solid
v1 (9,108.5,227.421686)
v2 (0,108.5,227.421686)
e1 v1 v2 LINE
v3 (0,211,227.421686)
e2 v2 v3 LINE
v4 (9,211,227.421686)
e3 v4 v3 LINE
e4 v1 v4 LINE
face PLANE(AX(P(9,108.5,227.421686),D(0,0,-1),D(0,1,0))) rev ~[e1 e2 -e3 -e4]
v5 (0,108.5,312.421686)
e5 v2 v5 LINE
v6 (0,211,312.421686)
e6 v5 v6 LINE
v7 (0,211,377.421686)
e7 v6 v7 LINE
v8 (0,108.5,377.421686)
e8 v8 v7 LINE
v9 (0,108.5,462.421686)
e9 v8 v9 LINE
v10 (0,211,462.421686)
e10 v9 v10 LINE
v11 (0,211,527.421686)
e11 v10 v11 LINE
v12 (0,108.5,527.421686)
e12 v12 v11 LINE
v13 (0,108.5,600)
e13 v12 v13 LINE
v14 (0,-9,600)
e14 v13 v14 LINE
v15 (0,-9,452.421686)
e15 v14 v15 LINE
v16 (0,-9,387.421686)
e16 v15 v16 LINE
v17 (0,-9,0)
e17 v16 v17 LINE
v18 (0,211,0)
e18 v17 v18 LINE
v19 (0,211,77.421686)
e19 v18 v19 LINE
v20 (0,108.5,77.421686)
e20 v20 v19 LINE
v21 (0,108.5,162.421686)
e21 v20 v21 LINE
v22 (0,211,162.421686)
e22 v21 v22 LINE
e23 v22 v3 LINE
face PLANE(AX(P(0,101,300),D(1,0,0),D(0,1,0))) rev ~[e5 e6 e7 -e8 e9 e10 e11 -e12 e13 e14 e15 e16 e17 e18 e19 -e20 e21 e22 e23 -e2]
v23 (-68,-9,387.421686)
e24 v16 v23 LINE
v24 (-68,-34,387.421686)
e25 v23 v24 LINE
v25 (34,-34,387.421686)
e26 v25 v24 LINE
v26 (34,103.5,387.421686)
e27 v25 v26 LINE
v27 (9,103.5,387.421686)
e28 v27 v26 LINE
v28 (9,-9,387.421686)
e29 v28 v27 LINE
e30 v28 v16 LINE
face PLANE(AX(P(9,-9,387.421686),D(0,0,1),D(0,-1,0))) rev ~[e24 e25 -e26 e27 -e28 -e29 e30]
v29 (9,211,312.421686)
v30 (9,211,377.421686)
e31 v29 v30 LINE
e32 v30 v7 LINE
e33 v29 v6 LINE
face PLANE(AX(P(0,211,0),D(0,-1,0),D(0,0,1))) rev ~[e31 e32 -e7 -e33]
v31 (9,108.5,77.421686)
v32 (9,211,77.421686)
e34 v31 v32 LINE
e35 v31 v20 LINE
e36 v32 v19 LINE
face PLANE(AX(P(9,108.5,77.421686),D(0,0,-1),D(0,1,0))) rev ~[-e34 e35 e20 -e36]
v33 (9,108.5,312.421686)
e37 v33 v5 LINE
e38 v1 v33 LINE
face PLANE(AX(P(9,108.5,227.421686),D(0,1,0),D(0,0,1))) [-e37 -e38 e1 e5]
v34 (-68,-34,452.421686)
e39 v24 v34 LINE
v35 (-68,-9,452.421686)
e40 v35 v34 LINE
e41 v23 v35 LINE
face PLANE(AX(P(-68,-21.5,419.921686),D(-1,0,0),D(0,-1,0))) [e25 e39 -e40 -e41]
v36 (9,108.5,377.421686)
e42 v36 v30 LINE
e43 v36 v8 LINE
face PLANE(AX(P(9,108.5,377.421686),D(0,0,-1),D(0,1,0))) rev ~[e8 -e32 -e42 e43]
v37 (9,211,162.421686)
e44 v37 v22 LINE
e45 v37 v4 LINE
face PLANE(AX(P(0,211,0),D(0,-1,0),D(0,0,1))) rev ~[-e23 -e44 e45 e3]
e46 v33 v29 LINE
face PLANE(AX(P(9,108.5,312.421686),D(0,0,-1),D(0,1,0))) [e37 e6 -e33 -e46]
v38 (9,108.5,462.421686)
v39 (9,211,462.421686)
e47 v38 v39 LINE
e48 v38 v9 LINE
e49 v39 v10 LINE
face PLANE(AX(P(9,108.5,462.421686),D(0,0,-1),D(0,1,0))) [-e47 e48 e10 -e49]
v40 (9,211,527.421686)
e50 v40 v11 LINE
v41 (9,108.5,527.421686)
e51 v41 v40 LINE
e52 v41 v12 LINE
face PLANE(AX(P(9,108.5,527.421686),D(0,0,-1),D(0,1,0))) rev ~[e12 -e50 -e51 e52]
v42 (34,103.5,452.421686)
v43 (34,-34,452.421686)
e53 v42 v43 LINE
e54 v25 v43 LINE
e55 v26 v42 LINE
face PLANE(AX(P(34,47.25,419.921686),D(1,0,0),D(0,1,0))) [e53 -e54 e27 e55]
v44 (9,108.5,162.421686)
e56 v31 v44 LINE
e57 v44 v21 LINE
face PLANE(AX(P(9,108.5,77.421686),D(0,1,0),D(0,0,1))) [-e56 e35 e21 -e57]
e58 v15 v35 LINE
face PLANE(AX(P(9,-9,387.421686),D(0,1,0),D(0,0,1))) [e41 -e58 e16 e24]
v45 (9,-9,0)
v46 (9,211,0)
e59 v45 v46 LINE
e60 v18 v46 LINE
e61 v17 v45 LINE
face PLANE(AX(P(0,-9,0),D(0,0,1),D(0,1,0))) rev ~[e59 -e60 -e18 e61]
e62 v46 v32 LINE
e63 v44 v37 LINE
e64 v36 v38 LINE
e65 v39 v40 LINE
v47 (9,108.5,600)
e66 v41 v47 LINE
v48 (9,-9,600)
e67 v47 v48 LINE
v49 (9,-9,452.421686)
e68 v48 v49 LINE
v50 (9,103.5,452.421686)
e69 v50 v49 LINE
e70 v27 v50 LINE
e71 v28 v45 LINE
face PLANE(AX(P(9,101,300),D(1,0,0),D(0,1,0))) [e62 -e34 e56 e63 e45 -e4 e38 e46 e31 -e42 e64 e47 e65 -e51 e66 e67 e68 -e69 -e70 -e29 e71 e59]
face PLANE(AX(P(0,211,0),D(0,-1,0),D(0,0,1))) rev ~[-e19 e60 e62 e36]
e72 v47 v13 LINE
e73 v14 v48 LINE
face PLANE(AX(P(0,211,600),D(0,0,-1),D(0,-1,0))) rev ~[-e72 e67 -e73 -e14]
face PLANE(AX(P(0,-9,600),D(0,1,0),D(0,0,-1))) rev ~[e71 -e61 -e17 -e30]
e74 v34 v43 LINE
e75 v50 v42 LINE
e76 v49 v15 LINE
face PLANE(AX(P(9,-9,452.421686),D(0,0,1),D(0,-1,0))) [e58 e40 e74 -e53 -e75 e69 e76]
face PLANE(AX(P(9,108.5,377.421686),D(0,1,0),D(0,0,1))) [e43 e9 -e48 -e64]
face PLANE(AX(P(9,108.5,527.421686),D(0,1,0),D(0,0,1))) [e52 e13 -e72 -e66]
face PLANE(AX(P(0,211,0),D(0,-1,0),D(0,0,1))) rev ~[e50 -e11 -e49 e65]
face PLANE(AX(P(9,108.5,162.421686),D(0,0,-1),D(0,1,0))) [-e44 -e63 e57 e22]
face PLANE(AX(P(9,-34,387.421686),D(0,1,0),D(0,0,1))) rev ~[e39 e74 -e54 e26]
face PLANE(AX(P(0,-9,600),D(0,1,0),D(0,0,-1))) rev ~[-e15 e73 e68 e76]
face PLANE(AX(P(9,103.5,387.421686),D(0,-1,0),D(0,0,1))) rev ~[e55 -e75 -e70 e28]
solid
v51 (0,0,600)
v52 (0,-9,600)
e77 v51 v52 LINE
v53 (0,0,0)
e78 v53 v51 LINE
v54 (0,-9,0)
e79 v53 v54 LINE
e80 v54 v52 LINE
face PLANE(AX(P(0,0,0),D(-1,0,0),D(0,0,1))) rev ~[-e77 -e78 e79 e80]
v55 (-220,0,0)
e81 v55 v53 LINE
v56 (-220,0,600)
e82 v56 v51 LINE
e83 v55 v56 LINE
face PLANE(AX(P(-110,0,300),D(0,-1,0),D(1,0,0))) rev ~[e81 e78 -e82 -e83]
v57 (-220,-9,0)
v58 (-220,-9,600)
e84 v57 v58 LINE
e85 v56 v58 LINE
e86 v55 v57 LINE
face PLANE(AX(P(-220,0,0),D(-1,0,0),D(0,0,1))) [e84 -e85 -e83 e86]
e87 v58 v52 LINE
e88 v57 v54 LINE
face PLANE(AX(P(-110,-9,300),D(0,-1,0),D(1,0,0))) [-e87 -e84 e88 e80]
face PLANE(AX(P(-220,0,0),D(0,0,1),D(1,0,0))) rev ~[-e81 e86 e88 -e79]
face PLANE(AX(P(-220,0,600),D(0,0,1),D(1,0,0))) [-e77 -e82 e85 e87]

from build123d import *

# Parameters (mm, degrees)
F0_W     = 220
F0_H     = 600
F1_DEPTH = 9
F3_DEPTH = 9
F4_W     = 102.5
F4_H     = 72.5783139467
F4_H_2   = 85
F5_DEPTH = 25
F6_W     = 112.5
F6_H     = 65
F6_W_2   = 25
F7_DEPTH = 25
F8_W     = 25
F8_H     = 65
F9_DEPTH = 77


with BuildPart() as f1:
    # F0 (on Front) → F1 (new body)
    with BuildSketch(Plane.XZ):
        with Locations((-110, 300)):
            Rectangle(F0_W, F0_H)
    extrude(amount=F1_DEPTH)


with BuildPart() as f3:
    # F2 (on Right) → F3 (new body)
    with BuildSketch(Plane.YZ):
        Polygon((-9, 0), (0, 0), (211, 0), (211, 600), (-9, 600), align=None)
    extrude(amount=F3_DEPTH)

    # F4 (on face) → F5 (cut)
    with BuildSketch(Plane.YZ.offset(9)):
        with Locations((159.75, 563.7108430266)):
            Rectangle(F4_W, F4_H)
        with Locations((159.75, 419.9216860533)):
            Rectangle(F4_W, F4_H_2)
        with Locations((159.75, 119.9216860533)):
            Rectangle(F4_W, F4_H_2)
        with Locations((159.75, 269.9216860533)):
            Rectangle(F4_W, F4_H_2)
    extrude(amount=-F5_DEPTH, mode=Mode.SUBTRACT)

    # F6 (on face) → F7 (join)
    with BuildSketch(Plane.YZ.offset(9)):
        with Locations((47.25, 419.9216860533)):
            Rectangle(F6_W, F6_H)
        with Locations((-21.5, 419.9216860533)):
            Rectangle(F6_W_2, F6_H)
    extrude(amount=F7_DEPTH)

    # F8 (on face) → F9 (join)
    with BuildSketch(Plane(origin=(9, 0, 0), x_dir=(0, -1, 0), z_dir=(-1, 0, 0))):
        with Locations((21.5, 419.9216860533)):
            Rectangle(F8_W, F8_H)
    extrude(amount=F9_DEPTH)


solid = Compound([f1.part, f3.part])
